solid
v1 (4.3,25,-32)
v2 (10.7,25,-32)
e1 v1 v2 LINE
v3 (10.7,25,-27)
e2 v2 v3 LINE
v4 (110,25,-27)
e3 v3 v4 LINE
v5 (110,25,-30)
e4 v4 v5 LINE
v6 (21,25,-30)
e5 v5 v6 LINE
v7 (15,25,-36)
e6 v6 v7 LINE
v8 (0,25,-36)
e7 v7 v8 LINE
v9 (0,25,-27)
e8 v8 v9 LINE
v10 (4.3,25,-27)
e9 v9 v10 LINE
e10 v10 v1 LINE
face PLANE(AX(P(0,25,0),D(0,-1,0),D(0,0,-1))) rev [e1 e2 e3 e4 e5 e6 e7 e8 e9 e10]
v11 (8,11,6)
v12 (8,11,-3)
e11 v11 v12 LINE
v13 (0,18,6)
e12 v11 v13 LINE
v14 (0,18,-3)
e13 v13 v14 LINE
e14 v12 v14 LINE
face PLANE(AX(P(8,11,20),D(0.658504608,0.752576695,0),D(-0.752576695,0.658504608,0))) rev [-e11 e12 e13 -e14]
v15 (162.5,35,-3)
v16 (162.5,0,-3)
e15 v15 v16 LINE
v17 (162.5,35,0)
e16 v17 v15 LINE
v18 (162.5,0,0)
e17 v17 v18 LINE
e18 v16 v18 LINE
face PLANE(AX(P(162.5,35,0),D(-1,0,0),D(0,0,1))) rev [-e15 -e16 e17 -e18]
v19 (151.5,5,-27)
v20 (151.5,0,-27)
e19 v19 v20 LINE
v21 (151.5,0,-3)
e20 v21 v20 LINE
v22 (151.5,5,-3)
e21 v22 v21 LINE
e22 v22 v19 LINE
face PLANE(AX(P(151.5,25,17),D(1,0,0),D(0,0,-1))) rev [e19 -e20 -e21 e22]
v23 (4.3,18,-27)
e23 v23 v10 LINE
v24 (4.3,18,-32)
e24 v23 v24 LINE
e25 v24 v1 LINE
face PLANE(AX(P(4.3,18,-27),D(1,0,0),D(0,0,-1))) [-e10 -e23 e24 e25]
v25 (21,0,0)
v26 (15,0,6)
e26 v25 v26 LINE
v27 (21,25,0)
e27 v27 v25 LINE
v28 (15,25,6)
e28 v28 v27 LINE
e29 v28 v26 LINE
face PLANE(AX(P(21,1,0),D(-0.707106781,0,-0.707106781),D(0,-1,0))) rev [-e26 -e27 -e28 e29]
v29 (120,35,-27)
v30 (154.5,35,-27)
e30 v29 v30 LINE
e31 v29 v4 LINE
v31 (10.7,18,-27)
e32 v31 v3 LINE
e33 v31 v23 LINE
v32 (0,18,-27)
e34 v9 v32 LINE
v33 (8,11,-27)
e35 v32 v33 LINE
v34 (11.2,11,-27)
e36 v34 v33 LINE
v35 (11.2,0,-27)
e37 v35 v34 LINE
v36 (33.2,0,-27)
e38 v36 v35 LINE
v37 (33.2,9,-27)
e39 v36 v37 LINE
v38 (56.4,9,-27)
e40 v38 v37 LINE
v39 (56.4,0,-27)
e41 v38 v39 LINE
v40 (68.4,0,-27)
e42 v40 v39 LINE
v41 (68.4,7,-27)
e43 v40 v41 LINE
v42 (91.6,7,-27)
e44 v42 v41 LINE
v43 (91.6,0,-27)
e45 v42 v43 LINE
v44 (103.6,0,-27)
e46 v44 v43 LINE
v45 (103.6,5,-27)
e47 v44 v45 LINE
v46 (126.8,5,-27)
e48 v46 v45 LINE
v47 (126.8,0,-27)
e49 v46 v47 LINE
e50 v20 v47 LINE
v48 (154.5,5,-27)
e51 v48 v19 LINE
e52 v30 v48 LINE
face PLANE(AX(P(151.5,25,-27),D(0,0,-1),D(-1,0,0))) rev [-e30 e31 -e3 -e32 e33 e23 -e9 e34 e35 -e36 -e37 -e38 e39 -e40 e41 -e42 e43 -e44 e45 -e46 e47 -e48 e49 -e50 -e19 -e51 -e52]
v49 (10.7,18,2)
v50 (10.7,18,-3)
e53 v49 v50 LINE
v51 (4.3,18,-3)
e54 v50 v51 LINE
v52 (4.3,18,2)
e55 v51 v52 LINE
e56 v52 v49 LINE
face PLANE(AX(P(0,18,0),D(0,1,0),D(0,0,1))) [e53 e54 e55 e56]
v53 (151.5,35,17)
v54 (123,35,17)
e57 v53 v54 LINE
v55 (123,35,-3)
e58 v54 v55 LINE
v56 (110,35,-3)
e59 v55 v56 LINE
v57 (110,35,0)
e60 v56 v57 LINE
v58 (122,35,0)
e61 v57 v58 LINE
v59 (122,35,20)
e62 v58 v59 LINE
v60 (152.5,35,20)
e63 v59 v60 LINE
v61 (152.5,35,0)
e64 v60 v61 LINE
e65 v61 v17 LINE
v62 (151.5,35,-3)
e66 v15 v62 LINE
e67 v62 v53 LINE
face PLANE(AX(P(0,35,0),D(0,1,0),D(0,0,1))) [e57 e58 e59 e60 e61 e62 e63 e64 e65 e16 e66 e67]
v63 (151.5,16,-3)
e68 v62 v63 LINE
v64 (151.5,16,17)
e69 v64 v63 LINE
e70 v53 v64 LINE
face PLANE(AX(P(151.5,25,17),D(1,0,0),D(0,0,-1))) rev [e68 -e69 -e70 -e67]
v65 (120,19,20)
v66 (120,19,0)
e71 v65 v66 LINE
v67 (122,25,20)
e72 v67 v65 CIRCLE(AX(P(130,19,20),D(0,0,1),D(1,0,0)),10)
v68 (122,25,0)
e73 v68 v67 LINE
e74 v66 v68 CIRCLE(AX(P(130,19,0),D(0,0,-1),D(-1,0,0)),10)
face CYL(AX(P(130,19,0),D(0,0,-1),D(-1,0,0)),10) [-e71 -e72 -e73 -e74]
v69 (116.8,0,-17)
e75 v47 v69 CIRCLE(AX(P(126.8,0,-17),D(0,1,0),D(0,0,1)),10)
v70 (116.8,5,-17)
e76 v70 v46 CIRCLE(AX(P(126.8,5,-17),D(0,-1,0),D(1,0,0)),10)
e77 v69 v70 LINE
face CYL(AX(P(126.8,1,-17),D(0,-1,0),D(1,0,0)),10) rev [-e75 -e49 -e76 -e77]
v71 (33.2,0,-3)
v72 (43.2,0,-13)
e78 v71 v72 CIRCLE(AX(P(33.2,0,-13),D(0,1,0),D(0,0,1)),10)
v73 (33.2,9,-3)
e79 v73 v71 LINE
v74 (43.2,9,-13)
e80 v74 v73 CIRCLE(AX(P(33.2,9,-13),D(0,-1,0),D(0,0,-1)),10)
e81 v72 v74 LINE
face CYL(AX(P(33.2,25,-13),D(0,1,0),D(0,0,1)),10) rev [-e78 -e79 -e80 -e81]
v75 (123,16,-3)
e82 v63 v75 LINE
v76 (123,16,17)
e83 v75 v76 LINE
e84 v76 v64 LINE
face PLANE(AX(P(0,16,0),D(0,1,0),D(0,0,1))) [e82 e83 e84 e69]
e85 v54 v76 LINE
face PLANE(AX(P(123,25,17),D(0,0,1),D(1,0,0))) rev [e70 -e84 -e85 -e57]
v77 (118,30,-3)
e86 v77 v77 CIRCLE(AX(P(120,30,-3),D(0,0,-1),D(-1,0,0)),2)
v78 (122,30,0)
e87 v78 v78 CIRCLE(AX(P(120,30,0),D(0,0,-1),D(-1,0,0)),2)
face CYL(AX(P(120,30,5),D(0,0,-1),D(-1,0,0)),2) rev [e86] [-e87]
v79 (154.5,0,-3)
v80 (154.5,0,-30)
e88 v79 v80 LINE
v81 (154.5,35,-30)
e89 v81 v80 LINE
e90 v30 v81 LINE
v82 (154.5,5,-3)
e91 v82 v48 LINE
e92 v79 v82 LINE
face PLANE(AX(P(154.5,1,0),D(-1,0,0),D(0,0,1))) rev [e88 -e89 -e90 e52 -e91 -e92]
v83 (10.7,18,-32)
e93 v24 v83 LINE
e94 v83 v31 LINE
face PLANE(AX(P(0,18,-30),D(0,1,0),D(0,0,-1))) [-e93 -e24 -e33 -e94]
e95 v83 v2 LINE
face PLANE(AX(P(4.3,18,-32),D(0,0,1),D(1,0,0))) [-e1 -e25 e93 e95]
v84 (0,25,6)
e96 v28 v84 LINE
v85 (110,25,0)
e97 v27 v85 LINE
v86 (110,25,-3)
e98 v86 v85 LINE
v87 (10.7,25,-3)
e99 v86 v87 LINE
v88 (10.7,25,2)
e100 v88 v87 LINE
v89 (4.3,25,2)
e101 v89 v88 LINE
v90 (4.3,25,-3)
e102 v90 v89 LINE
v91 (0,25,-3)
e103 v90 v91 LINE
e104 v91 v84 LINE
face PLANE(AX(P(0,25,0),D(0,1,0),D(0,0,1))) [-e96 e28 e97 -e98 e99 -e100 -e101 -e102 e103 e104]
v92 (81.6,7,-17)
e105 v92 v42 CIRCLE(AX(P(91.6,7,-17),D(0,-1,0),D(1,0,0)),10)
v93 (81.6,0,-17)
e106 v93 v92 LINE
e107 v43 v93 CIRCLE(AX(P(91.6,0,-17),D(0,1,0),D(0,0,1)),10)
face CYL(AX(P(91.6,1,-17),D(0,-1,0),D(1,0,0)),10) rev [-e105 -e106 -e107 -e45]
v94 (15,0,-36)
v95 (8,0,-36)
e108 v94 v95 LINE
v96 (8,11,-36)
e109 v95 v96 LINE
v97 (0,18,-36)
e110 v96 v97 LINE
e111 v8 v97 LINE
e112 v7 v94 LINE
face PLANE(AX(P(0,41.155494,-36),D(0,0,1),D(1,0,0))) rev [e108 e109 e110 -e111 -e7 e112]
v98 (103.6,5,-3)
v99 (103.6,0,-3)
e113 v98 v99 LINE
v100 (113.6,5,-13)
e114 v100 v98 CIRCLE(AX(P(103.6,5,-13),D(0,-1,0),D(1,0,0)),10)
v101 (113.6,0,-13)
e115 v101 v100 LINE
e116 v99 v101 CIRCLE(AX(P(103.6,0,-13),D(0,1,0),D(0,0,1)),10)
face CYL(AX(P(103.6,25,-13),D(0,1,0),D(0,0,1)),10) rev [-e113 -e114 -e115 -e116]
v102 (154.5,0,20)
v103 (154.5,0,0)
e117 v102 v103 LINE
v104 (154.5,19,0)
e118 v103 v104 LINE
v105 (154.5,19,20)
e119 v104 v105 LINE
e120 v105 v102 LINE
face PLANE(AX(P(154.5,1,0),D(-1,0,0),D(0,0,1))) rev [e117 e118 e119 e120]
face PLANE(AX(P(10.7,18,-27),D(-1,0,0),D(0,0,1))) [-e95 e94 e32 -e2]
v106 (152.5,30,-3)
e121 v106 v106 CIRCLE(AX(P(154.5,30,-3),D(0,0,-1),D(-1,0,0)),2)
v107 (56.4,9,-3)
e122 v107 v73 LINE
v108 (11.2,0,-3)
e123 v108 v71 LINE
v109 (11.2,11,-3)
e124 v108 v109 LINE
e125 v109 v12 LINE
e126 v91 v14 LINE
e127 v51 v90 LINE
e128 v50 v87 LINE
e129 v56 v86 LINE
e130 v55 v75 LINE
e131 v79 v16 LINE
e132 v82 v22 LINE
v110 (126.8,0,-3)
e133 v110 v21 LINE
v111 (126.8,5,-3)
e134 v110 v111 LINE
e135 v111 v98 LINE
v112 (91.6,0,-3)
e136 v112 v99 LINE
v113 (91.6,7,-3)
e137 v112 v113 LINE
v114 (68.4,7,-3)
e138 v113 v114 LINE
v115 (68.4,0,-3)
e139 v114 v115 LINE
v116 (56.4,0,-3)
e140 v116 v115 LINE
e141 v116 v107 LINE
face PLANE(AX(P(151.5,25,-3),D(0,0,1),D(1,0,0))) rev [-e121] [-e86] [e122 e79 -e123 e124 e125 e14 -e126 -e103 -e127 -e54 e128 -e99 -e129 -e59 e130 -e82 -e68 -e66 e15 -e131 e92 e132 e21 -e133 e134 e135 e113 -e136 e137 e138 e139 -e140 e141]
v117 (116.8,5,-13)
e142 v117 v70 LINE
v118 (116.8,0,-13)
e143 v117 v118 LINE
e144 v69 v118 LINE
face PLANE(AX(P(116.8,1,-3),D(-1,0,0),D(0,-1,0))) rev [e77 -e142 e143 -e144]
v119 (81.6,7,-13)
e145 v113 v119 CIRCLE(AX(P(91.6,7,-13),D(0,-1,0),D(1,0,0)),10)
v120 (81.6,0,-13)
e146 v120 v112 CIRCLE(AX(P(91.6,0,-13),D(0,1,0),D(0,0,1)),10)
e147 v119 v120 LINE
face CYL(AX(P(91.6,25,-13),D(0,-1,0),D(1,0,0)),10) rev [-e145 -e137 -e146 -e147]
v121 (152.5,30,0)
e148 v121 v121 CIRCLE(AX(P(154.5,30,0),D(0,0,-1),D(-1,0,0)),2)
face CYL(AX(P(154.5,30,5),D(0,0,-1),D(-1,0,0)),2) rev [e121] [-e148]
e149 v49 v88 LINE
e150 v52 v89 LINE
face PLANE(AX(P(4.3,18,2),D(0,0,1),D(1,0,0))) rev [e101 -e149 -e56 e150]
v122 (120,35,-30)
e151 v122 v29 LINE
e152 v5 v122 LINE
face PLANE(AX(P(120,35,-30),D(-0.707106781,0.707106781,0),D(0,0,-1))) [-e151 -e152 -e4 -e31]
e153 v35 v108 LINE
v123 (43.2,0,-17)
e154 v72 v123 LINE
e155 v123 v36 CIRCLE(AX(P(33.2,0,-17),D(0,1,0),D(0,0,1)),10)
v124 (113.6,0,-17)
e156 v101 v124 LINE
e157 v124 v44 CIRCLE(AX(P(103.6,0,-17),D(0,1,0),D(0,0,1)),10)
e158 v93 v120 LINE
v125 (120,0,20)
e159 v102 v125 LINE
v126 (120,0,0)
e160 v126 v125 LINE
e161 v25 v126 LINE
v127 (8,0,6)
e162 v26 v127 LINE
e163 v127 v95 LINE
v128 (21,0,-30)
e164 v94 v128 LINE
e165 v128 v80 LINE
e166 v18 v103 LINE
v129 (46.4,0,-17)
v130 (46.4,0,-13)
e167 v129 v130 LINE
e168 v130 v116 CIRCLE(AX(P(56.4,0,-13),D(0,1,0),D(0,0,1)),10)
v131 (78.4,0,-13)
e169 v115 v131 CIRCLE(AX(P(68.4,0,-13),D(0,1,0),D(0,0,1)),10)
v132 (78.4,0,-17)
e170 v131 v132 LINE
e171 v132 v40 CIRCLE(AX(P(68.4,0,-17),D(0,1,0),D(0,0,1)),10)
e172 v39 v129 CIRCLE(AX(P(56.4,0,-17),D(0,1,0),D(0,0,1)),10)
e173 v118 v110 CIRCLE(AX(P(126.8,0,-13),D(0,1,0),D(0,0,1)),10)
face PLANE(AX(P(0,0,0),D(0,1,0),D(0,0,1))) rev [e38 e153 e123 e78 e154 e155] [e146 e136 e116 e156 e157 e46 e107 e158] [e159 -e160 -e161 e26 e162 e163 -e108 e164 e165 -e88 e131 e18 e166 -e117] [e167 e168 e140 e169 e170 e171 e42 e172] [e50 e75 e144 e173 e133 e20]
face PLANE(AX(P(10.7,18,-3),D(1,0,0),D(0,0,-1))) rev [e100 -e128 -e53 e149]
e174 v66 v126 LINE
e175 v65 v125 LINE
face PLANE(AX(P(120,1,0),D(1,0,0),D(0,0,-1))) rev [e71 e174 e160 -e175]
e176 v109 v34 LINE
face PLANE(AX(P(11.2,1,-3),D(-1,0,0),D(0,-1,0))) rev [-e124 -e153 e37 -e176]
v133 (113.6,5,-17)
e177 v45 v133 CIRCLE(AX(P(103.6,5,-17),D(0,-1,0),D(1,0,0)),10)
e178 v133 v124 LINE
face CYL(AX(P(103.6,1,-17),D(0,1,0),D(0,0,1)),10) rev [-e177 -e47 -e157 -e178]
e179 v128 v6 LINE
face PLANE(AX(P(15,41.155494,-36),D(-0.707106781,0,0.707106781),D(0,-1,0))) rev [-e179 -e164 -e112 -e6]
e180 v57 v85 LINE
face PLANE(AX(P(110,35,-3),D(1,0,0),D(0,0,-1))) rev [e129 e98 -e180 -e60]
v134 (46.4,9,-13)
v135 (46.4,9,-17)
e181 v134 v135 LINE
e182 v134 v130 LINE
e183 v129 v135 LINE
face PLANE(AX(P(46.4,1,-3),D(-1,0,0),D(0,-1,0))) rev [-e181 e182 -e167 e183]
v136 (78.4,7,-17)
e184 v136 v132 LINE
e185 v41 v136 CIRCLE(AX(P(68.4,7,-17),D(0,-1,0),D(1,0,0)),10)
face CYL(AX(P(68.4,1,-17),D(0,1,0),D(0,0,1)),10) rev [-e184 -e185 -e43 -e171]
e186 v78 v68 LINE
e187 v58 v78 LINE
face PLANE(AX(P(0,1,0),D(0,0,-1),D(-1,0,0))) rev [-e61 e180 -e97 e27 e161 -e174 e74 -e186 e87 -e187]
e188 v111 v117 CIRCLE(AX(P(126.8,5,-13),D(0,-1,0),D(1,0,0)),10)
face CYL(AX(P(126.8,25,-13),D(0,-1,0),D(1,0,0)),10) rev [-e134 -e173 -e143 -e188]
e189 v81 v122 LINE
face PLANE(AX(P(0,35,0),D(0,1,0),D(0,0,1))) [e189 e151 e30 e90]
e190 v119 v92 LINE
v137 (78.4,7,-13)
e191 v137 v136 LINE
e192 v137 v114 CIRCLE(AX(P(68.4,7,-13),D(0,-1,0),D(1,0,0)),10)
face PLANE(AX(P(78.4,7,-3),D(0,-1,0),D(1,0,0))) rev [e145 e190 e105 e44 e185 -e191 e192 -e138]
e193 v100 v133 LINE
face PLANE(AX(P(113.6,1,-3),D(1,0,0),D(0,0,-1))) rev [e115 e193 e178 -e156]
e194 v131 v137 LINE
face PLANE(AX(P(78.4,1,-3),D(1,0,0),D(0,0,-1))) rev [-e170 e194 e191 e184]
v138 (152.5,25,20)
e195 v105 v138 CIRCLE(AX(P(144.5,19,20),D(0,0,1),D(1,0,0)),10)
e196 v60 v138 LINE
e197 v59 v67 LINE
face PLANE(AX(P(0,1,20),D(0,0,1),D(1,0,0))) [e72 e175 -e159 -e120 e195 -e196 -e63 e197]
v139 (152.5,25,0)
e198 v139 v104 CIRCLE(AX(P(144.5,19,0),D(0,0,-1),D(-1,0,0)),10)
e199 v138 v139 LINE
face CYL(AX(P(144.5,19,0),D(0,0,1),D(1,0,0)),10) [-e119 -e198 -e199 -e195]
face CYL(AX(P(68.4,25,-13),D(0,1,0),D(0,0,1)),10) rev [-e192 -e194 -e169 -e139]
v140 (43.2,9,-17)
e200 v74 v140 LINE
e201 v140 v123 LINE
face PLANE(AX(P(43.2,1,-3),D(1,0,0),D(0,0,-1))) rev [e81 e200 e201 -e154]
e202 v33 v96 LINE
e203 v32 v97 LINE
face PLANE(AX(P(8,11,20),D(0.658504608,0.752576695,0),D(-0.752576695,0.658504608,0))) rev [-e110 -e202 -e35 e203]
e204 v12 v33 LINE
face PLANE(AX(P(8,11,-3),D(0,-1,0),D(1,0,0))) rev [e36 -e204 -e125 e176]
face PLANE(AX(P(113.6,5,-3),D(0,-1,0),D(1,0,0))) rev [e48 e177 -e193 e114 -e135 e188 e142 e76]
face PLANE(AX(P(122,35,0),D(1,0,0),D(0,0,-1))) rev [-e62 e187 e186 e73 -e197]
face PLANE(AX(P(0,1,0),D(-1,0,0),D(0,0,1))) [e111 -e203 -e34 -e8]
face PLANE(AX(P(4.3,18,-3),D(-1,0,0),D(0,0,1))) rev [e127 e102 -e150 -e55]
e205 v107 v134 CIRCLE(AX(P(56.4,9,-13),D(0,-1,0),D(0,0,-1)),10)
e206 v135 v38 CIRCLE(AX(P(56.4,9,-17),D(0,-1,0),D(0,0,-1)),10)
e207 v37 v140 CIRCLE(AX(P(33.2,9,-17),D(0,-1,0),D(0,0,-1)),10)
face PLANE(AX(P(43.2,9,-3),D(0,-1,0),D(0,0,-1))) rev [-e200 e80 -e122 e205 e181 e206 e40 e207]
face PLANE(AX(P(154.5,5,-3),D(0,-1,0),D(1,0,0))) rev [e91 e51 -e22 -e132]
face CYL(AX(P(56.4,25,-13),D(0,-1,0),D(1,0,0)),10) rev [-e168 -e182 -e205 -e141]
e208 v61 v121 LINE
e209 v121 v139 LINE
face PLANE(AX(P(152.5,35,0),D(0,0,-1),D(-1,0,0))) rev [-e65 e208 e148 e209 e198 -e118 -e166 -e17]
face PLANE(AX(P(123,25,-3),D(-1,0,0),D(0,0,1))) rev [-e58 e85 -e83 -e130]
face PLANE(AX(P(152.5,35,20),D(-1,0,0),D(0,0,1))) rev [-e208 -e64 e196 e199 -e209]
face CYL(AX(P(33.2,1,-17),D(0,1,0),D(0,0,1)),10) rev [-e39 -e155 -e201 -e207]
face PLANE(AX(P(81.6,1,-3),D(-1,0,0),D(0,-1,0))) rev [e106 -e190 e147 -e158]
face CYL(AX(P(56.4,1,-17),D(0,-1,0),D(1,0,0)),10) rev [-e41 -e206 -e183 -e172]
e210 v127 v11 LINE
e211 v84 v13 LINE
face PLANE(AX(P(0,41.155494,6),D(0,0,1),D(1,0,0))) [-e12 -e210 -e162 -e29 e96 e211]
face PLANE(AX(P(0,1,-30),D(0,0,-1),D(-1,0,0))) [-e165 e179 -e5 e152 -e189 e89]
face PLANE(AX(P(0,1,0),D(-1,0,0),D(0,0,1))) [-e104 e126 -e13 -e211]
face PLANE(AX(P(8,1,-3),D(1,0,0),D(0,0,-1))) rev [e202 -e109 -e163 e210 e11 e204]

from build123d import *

# Parameters (mm, degrees)
SKETCH1_W               = 154.5
SKETCH1_H               = 30
SKETCH1_W_2             = 34.5
SKETCH1_H_2             = 20
BOSS_EXTRUDE2_DEPTH     = 1
BOSS_EXTRUDE5_DEPTH     = 24
SKETCH5_W               = 3.2
SKETCH5_H               = 10
SKETCH5_H_2             = 8
SKETCH5_H_3             = 6
SKETCH5_H_4             = 4
SKETCH5_W_2             = 3
BOSS_EXTRUDE6_DEPTH     = 24
SKETCH6_W               = 28.5
SKETCH6_H               = 20
BOSS_EXTRUDE7_DEPTH     = 15
BOSS_EXTRUDE8_DEPTH     = 10
SKETCH9_W               = 8
SKETCH9_H               = 3
BOSS_EXTRUDE9_DEPTH     = 25
SKETCH10_R              = 2
CUT_EXTRUDE1_DEPTH      = 8
SKETCH11_W              = 32
SKETCH11_H              = 24
SKETCH11_W_2            = 34.7
CUT_EXTRUDE2_DEPTH      = 8
FILLET1_R               = 10
SKETCH13_W              = 15
SKETCH13_H              = 6
BOSS_EXTRUDE10_DEPTH    = 25
SKETCH15_W              = 6.4
SKETCH15_H              = 5
CUT_EXTRUDE3_DEPTH      = 7
CUT_EXTRUDE4_DEPTH      = 170.470498908
CUT_EXTRUDE4_DEPTH_BACK = 170.470498908
CHAMFER1_SIZE           = 6
SKETCH17_W              = 34.5
SKETCH17_H              = 3
BOSS_EXTRUDE11_DEPTH    = 10
CHAMFER2_SIZE           = 10


# Some blends are built 0.0001 mm under size
with BuildPart() as part:
    # Sketch1 → Boss-Extrude2 (new body)
    with BuildSketch(Plane(origin=(0, 0, 0), x_dir=(1, 0, 0), z_dir=(0, 1, 0))):
        with Locations((77.25, 15)):
            Rectangle(SKETCH1_W, SKETCH1_H)
        with Locations((137.25, -10)):
            Rectangle(SKETCH1_W_2, SKETCH1_H_2)
    extrude(amount=BOSS_EXTRUDE2_DEPTH)

    # Sketch2 → Boss-Extrude5 (add)
    with BuildSketch(Plane(origin=(0, 1, 0), x_dir=(1, 0, 0), z_dir=(0, 1, 0))):
        Polygon((3, 27), (0, 27), (0, 30), (154.5, 30), (154.5, 27), (151.5, 27), align=None)
        Polygon((0, 0), (120, 0), (120, -20), (154.5, -20), (154.5, 3), (151.5, 3), (151.5, -17), (123, -17), (123, 3), (3, 3), (0, 3), align=None)
    extrude(amount=BOSS_EXTRUDE5_DEPTH)

    # Sketch5 → Boss-Extrude6 (add)
    with BuildSketch(Plane.XY.offset(-27)):
        with Locations((9.6, 6)):
            Rectangle(SKETCH5_W, SKETCH5_H)
        with Locations((44.8, 5)):
            Rectangle(SKETCH5_W, SKETCH5_H_2)
        with Locations((80, 4)):
            Rectangle(SKETCH5_W, SKETCH5_H_3)
        with Locations((115.2, 3)):
            Rectangle(SKETCH5_W, SKETCH5_H_4)
        with Locations((153, 3)):
            Rectangle(SKETCH5_W_2, SKETCH5_H_4)
    extrude(amount=BOSS_EXTRUDE6_DEPTH)

    # Sketch6 → Boss-Extrude7 (add)
    with BuildSketch(Plane(origin=(0, 1, 0), x_dir=(1, 0, 0), z_dir=(0, 1, 0))):
        with Locations((137.25, -7)):
            Rectangle(SKETCH6_W, SKETCH6_H)
    extrude(amount=BOSS_EXTRUDE7_DEPTH)

    # Sketch7 → Boss-Extrude8 (add)
    with BuildSketch(Plane(origin=(0, 25, 0), x_dir=(1, 0, 0), z_dir=(0, 1, 0))):
        Polygon((110, 3), (110, 0), (122, 0), (122, -20), (152.5, -20), (152.5, 0), (162.5, 0), (162.5, 3), (151.5, 3), (151.5, -17), (123, -17), (123, 3), align=None)
    extrude(amount=BOSS_EXTRUDE8_DEPTH)

    # Sketch9 → Boss-Extrude9 (add)
    with BuildSketch(Plane.XZ.offset(-25)):
        with Locations((158.5, -1.5)):
            Rectangle(SKETCH9_W, SKETCH9_H)
    extrude(amount=BOSS_EXTRUDE9_DEPTH)

    # Sketch10 → Cut-Extrude1 (cut)
    with BuildSketch(Plane(origin=(0, 0, -3), x_dir=(-1, 0, 0), z_dir=(0, 0, -1))):
        with Locations((-120, 30)):
            Circle(SKETCH10_R)
        with Locations((-154.5, 30)):
            Circle(SKETCH10_R)
    extrude(amount=-CUT_EXTRUDE1_DEPTH, mode=Mode.SUBTRACT)

    # Sketch11 → Cut-Extrude2 (cut)
    with BuildSketch(Plane(origin=(0, 1, 0), x_dir=(1, 0, 0), z_dir=(0, 1, 0))):
        with Locations((27.2, 15)):
            Rectangle(SKETCH11_W, SKETCH11_H)
        with Locations((62.4, 15)):
            Rectangle(SKETCH11_W, SKETCH11_H)
        with Locations((97.6, 15)):
            Rectangle(SKETCH11_W, SKETCH11_H)
        with Locations((134.15, 15)):
            Rectangle(SKETCH11_W_2, SKETCH11_H)
    extrude(amount=-CUT_EXTRUDE2_DEPTH, mode=Mode.SUBTRACT)

    # Fillet1
    # the kernel refuses this fillet: 10 mm, written as the material it adds along each edge
    with BuildSketch(Plane(origin=(46.4, 0, -3), x_dir=(1, 0, 0), z_dir=(0, 1, 0)), Plane(origin=(43.2, 9, -3), x_dir=(-1, 0, 0), z_dir=(0, -1, 0)), Plane(origin=(46.4, 9, -27), x_dir=(1, 0, 0), z_dir=(0, -1, 0))) as fillet1_piece_1:
        with BuildLine():
            CenterArc((FILLET1_R, FILLET1_R), FILLET1_R, 180, 90)
            Line((0, FILLET1_R), (0, 0))
            Line((0, 0), (FILLET1_R, 0))
        make_face()
    extrude(amount=9)
    with BuildSketch(Plane(origin=(81.6, 0, -3), x_dir=(1, 0, 0), z_dir=(0, 1, 0)), Plane(origin=(78.4, 0, -27), x_dir=(-1, 0, 0), z_dir=(0, 1, 0)), Plane(origin=(78.4, 7, -3), x_dir=(-1, 0, 0), z_dir=(0, -1, 0)), Plane(origin=(81.6, 7, -27), x_dir=(1, 0, 0), z_dir=(0, -1, 0))) as fillet1_piece_2:
        with BuildLine():
            CenterArc((FILLET1_R, FILLET1_R), FILLET1_R, 180, 90)
            Line((0, FILLET1_R), (0, 0))
            Line((0, 0), (FILLET1_R, 0))
        make_face()
    extrude(amount=7)
    with BuildSketch(Plane(origin=(116.8, 0, -3), x_dir=(1, 0, 0), z_dir=(0, 1, 0)), Plane(origin=(113.6, 0, -27), x_dir=(-1, 0, 0), z_dir=(0, 1, 0)), Plane(origin=(113.6, 5, -3), x_dir=(-1, 0, 0), z_dir=(0, -1, 0))) as fillet1_piece_3:
        with BuildLine():
            CenterArc((FILLET1_R, FILLET1_R), FILLET1_R, 180, 90)
            Line((0, FILLET1_R), (0, 0))
            Line((0, 0), (FILLET1_R, 0))
        make_face()
    extrude(amount=5)
    with BuildSketch(Plane(origin=(43.2, 9, -27), x_dir=(-1, 0, 0), z_dir=(0, -1, 0))) as fillet1_piece_4:
        with BuildLine():
            CenterArc((FILLET1_R, -FILLET1_R), FILLET1_R, 90, 90)
            Line((0, -FILLET1_R), (0, 0))
            Line((0, 0), (FILLET1_R, 0))
        make_face()
    extrude(amount=9)
    with BuildSketch(Plane(origin=(116.8, 5, -27), x_dir=(0, 0, 1), z_dir=(0, -1, 0))) as fillet1_piece_5:
        with BuildLine():
            CenterArc((FILLET1_R, -FILLET1_R), FILLET1_R, 90, 90)
            Line((0, -FILLET1_R), (0, 0))
            Line((0, 0), (FILLET1_R, 0))
        make_face()
    extrude(amount=5)
    # the kernel refuses this fillet: 10 mm, written as the material it takes off along each edge
    with BuildSketch(Plane(origin=(154.5, 25, 35), x_dir=(0, -1, 0), z_dir=(0, 0, -1))) as fillet1_2_piece_1:
        with BuildLine():
            CenterArc((6, 10), FILLET1_R, 233.130102354, 36.869897646)
            Line((0, 2), (0, 0))
            Line((0, 0), (6, 0))
        make_face()
    extrude(amount=35, mode=Mode.SUBTRACT)
    with BuildSketch(Plane(origin=(120, 25, 0), x_dir=(1, 0, 0), z_dir=(0, 0, 1))) as fillet1_2_piece_2:
        with BuildLine():
            CenterArc((10, -6), FILLET1_R, 143.130102354, 36.869897646)
            Line((0, -6), (0, 0))
            Line((0, 0), (2, 0))
        make_face()
    extrude(amount=35, mode=Mode.SUBTRACT)

    # Sketch13 → Boss-Extrude10 (add)
    with BuildSketch(Plane.XZ):
        with Locations((7.5, 3)):
            Rectangle(SKETCH13_W, SKETCH13_H)
    boss_extrude10 = extrude(amount=-BOSS_EXTRUDE10_DEPTH)

    # Sketch15 → Cut-Extrude3 (cut)
    with BuildSketch(Plane(origin=(0, 25, 0), x_dir=(1, 0, 0), z_dir=(0, 1, 0))):
        with Locations((7.5, 0.5)):
            Rectangle(SKETCH15_W, SKETCH15_H)
    cut_extrude3 = extrude(amount=-CUT_EXTRUDE3_DEPTH, mode=Mode.SUBTRACT)

    # Mirror1: Boss-Extrude10, Cut-Extrude3 across plane
    add(boss_extrude10.mirror(Plane.XY.offset(-15)))
    add(cut_extrude3.mirror(Plane.XY.offset(-15)), mode=Mode.SUBTRACT)

    # Sketch16 → Cut-Extrude4 (cut, two sides: drawn at the far end of the back side and taken through both)
    with BuildSketch(Plane(origin=(0, 0, -3), x_dir=(-1, 0, 0), z_dir=(0, 0, -1)).offset(-CUT_EXTRUDE4_DEPTH_BACK)):
        Polygon((-8, 11), (0, 18), (0, 0), (-8, 0), align=None)
    extrude(amount=CUT_EXTRUDE4_DEPTH + CUT_EXTRUDE4_DEPTH_BACK, mode=Mode.SUBTRACT)

    # Chamfer1
    chamfer1_edges = [part.edges().sort_by_distance(p)[0] for p in [
        (15, 12.5, -30),
        (15, 12.5, 0),
    ]]
    chamfer(chamfer1_edges, length=CHAMFER1_SIZE - 0.0001)  # a hair under: the kernel refuses the full size

    # Sketch17 → Boss-Extrude11 (add)
    with BuildSketch(Plane(origin=(0, 25, 0), x_dir=(1, 0, 0), z_dir=(0, 1, 0))):
        with Locations((137.25, 28.5)):
            Rectangle(SKETCH17_W, SKETCH17_H)
    extrude(amount=BOSS_EXTRUDE11_DEPTH)

    # Chamfer2
    chamfer2_edges = [part.edges().sort_by_distance(p)[0] for p in [
        (120, 25, -28.5),
    ]]
    chamfer(chamfer2_edges, length=CHAMFER2_SIZE - 0.0001)  # a hair under: the kernel refuses the full size


solid = part.part
